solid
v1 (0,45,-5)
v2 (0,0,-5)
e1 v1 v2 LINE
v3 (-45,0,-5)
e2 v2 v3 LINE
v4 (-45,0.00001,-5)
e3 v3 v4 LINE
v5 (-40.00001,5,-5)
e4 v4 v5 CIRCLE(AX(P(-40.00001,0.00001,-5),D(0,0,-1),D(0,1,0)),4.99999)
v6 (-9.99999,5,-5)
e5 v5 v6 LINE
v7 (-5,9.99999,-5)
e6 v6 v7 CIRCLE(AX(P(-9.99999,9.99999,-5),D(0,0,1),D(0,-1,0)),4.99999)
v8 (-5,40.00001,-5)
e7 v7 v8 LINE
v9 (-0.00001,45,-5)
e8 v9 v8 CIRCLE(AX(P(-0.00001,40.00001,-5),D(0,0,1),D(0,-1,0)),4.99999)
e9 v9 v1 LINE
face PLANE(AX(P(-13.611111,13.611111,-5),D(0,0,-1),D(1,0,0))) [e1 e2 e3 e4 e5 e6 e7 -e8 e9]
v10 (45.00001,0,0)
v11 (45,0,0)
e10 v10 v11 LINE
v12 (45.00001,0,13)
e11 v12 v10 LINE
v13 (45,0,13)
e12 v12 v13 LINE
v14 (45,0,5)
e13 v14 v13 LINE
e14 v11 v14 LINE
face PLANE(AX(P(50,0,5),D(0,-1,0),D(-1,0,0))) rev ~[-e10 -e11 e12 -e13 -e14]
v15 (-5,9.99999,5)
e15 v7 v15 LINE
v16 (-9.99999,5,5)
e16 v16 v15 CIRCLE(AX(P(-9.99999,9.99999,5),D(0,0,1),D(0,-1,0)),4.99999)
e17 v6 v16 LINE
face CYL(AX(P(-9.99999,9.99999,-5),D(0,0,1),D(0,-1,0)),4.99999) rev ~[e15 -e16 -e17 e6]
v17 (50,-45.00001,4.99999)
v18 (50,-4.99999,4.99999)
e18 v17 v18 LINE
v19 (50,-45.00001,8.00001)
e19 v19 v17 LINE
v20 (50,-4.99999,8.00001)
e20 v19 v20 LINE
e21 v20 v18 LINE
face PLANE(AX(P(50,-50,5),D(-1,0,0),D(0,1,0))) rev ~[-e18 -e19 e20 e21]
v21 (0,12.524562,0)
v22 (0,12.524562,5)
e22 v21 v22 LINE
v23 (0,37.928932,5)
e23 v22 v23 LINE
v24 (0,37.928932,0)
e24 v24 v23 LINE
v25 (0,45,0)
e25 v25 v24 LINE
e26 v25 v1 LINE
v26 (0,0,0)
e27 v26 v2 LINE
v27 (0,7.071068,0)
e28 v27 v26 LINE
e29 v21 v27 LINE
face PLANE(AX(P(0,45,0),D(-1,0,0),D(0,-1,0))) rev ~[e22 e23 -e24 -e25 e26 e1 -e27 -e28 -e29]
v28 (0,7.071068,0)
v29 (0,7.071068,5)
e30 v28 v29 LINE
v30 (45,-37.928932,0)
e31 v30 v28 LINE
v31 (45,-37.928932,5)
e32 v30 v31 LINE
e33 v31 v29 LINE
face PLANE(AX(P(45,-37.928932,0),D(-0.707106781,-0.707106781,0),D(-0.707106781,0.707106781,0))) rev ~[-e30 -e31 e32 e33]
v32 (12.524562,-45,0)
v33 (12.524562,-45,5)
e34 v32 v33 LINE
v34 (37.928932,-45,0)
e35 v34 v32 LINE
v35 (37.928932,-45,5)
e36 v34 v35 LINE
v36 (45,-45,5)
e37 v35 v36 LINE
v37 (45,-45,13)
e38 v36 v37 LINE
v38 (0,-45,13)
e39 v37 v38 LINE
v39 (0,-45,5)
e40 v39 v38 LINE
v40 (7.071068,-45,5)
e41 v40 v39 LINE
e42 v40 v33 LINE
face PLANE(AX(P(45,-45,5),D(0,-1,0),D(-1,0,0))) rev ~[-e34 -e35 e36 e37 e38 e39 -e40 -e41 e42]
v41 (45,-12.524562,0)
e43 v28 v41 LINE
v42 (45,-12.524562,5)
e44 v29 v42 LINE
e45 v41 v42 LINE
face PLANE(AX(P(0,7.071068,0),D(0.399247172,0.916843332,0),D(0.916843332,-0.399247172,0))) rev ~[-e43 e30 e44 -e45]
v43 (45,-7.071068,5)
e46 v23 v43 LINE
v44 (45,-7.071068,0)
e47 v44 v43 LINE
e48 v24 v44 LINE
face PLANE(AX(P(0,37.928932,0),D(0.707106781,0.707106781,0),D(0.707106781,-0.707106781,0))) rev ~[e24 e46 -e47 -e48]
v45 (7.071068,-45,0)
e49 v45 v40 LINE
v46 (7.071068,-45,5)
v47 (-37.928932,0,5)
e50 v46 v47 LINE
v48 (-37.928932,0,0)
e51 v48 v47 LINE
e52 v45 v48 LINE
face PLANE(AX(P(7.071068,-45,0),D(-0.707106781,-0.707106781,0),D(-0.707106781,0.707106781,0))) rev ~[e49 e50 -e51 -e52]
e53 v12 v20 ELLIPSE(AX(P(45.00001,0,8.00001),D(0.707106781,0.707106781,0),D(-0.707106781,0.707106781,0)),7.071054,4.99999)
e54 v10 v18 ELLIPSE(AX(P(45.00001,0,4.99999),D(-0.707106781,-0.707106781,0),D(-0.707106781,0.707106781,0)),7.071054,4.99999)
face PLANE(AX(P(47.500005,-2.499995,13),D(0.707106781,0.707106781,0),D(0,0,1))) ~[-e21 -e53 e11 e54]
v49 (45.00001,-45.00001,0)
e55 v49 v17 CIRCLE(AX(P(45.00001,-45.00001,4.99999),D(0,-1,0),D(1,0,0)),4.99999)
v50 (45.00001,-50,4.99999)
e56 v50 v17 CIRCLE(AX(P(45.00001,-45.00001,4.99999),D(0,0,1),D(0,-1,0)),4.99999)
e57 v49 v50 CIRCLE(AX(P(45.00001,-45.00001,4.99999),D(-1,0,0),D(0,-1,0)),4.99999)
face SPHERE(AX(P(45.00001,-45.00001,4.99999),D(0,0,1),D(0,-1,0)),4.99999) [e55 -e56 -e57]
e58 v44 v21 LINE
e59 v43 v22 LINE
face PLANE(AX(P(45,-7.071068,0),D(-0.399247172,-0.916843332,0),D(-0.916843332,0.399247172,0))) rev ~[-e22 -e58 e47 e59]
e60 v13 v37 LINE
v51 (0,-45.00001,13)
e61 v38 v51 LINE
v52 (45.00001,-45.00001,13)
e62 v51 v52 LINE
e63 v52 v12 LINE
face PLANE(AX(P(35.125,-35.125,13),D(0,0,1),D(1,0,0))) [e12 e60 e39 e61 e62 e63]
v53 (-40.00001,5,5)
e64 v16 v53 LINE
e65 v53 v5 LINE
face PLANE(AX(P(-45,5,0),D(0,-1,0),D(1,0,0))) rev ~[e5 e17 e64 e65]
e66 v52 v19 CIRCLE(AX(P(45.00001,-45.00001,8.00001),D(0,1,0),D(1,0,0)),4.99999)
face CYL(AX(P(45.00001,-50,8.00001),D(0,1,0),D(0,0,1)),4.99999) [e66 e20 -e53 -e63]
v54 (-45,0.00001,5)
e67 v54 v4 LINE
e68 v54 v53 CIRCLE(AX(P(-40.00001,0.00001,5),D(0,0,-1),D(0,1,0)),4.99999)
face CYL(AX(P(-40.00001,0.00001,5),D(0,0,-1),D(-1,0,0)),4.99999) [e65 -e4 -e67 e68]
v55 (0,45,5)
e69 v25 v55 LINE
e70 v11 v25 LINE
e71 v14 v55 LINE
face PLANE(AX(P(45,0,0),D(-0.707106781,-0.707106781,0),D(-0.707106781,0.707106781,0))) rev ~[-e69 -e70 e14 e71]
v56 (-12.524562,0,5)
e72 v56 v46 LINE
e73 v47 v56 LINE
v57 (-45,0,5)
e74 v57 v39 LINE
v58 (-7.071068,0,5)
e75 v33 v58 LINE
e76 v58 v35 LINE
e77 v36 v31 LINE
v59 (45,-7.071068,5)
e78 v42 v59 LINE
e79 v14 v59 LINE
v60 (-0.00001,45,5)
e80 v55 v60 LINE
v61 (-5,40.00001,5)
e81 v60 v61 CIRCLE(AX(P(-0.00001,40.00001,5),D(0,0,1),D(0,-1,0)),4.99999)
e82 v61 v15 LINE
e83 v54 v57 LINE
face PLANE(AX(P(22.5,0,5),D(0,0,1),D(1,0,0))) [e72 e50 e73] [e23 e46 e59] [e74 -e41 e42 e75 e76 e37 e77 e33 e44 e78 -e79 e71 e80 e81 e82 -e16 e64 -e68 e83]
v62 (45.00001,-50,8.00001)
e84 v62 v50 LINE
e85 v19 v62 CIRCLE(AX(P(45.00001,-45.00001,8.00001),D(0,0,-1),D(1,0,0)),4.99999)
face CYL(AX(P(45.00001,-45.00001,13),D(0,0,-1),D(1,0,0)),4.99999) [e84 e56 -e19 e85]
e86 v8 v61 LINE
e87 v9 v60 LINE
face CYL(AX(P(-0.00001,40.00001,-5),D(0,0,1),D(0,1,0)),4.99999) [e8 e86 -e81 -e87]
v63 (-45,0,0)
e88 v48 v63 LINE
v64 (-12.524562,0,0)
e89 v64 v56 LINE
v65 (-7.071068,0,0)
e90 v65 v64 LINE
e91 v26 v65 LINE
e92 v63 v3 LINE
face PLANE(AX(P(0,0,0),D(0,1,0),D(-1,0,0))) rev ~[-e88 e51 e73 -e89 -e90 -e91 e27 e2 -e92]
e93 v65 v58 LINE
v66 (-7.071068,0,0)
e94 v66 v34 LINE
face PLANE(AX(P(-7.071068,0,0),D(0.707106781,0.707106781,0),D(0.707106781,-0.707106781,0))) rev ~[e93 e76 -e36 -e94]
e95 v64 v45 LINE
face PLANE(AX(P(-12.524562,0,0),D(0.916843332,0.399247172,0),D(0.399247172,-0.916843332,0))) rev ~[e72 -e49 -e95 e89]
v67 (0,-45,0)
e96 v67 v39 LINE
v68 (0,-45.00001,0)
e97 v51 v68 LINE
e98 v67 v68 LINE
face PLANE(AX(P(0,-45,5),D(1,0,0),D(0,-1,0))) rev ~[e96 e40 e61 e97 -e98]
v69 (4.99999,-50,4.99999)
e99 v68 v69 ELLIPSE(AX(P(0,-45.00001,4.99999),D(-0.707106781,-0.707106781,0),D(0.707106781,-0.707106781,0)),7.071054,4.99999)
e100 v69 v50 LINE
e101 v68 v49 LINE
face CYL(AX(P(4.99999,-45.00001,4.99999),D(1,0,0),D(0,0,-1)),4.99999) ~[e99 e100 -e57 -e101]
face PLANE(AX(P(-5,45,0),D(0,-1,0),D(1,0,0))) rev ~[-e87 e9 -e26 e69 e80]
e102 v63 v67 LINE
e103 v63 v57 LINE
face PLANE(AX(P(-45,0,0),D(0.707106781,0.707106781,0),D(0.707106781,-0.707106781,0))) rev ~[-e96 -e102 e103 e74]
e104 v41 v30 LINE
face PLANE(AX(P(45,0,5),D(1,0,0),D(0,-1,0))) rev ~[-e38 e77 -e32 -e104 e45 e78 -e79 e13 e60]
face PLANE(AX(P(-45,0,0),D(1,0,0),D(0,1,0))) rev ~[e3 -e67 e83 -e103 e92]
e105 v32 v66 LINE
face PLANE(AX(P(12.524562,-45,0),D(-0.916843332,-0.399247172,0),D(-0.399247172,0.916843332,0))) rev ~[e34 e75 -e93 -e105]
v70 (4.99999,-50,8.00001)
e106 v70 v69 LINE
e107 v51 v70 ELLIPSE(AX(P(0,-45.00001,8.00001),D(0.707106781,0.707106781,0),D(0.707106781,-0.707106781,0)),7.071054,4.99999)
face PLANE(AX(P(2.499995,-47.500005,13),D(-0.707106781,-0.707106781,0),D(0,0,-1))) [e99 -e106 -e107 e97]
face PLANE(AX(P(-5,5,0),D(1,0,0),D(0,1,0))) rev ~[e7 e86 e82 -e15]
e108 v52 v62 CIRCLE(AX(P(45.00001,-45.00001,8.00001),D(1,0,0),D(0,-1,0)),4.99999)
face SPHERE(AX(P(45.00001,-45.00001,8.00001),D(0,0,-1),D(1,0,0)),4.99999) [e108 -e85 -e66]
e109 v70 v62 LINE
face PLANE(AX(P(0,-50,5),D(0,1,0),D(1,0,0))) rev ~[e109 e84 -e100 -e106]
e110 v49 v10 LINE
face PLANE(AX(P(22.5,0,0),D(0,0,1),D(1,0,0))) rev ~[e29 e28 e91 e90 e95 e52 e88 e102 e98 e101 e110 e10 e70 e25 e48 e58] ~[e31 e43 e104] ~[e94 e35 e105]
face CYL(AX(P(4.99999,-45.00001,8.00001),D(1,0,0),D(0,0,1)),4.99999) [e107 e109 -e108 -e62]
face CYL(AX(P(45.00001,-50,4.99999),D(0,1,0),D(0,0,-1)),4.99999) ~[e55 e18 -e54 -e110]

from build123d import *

# Parameters (mm, degrees)
F1_DEPTH  = 5
F3_DEPTH  = 5
F5_DEPTH  = 8
F6_SIZE   = 4.99999
F7_R      = 4.99999
F9_DEPTH  = 5
F11_DEPTH = 5


# Not quite as in the source:
# - a fillet or chamfer is up to 0.001 mm smaller than in the source, because OpenCascade refuses the exact size


with BuildPart() as f1:
    # F0 (on Top) → F1 (new body)
    with BuildSketch(Plane.XY):
        Polygon((0, 45), (-5, 45), (-5, 5), (-45, 5), (-45, 0), (0, -45), (0, -50), (50, -50), (50, 0), (45, 0), align=None)
        Polygon((45, -7.0710678119), (45, -45), (7.0710678119, -45), (-37.9289321881, 0), (0, 0), (0, 37.9289321881), align=None, mode=Mode.SUBTRACT)
    extrude(amount=F1_DEPTH)

    # F2 (on face) → F3 (join)
    with BuildSketch(Plane(origin=(0, 0, 0), x_dir=(1, 0, 0), z_dir=(0, 0, -1))):
        Polygon((0, -45), (0, 0), (-45, 0), (-45, -5), (-5, -5), (-5, -45), align=None)
    extrude(amount=F3_DEPTH)

    # F4 (on face) → F5 (join)
    with BuildSketch(Plane.XY.offset(5)):
        Polygon((50, 0), (45, 0), (45, -45), (0, -45), (0, -50), (50, -50), align=None)
    extrude(amount=F5_DEPTH)

    # F6 (size 5 in the source; OpenCascade refuses exactly that, so slightly less here)
    f6_edges = [f1.edges().sort_by_distance(p)[0] for p in [
        (0, -50, 6.5),
        (50, 0, 6.5),
    ]]
    chamfer(f6_edges, length=F6_SIZE)

    # F7 (radius 5 in the source; OpenCascade refuses exactly that, so slightly less here)
    f7_edges = [f1.edges().sort_by_distance(p)[0] for p in [
        (50, -50, 6.5),
        (-5, 45, 0),
        (-45, 5, 0),
        (-5, 5, 0),
        (50, -27.499995, 13),
        (27.499995, -50, 13),
        (27.499995, -50, 0),
        (50, -27.499995, 0),
    ]]
    fillet(f7_edges, radius=F7_R)

    # F8 (on Top) → F9 (join)
    with BuildSketch(Plane.XY):
        Polygon((0, 0), (-7.0710678119, 0), (37.9289321881, -45), (45, -45), (45, -37.9289321881), (0, 7.0710678119), align=None)
    extrude(amount=F9_DEPTH)

    # F10 (on Top) → F11 (join)
    with BuildSketch(Plane.XY):
        Polygon((45, -7.0710678119), (0, 12.524562237), (0, 7.0710678119), (45, -12.524562237), align=None)
        Polygon((12.524562237, -45), (-7.0710678119, 0), (-12.524562237, 0), (7.0710678119, -45), align=None)
    extrude(amount=F11_DEPTH)


solid = f1.part
